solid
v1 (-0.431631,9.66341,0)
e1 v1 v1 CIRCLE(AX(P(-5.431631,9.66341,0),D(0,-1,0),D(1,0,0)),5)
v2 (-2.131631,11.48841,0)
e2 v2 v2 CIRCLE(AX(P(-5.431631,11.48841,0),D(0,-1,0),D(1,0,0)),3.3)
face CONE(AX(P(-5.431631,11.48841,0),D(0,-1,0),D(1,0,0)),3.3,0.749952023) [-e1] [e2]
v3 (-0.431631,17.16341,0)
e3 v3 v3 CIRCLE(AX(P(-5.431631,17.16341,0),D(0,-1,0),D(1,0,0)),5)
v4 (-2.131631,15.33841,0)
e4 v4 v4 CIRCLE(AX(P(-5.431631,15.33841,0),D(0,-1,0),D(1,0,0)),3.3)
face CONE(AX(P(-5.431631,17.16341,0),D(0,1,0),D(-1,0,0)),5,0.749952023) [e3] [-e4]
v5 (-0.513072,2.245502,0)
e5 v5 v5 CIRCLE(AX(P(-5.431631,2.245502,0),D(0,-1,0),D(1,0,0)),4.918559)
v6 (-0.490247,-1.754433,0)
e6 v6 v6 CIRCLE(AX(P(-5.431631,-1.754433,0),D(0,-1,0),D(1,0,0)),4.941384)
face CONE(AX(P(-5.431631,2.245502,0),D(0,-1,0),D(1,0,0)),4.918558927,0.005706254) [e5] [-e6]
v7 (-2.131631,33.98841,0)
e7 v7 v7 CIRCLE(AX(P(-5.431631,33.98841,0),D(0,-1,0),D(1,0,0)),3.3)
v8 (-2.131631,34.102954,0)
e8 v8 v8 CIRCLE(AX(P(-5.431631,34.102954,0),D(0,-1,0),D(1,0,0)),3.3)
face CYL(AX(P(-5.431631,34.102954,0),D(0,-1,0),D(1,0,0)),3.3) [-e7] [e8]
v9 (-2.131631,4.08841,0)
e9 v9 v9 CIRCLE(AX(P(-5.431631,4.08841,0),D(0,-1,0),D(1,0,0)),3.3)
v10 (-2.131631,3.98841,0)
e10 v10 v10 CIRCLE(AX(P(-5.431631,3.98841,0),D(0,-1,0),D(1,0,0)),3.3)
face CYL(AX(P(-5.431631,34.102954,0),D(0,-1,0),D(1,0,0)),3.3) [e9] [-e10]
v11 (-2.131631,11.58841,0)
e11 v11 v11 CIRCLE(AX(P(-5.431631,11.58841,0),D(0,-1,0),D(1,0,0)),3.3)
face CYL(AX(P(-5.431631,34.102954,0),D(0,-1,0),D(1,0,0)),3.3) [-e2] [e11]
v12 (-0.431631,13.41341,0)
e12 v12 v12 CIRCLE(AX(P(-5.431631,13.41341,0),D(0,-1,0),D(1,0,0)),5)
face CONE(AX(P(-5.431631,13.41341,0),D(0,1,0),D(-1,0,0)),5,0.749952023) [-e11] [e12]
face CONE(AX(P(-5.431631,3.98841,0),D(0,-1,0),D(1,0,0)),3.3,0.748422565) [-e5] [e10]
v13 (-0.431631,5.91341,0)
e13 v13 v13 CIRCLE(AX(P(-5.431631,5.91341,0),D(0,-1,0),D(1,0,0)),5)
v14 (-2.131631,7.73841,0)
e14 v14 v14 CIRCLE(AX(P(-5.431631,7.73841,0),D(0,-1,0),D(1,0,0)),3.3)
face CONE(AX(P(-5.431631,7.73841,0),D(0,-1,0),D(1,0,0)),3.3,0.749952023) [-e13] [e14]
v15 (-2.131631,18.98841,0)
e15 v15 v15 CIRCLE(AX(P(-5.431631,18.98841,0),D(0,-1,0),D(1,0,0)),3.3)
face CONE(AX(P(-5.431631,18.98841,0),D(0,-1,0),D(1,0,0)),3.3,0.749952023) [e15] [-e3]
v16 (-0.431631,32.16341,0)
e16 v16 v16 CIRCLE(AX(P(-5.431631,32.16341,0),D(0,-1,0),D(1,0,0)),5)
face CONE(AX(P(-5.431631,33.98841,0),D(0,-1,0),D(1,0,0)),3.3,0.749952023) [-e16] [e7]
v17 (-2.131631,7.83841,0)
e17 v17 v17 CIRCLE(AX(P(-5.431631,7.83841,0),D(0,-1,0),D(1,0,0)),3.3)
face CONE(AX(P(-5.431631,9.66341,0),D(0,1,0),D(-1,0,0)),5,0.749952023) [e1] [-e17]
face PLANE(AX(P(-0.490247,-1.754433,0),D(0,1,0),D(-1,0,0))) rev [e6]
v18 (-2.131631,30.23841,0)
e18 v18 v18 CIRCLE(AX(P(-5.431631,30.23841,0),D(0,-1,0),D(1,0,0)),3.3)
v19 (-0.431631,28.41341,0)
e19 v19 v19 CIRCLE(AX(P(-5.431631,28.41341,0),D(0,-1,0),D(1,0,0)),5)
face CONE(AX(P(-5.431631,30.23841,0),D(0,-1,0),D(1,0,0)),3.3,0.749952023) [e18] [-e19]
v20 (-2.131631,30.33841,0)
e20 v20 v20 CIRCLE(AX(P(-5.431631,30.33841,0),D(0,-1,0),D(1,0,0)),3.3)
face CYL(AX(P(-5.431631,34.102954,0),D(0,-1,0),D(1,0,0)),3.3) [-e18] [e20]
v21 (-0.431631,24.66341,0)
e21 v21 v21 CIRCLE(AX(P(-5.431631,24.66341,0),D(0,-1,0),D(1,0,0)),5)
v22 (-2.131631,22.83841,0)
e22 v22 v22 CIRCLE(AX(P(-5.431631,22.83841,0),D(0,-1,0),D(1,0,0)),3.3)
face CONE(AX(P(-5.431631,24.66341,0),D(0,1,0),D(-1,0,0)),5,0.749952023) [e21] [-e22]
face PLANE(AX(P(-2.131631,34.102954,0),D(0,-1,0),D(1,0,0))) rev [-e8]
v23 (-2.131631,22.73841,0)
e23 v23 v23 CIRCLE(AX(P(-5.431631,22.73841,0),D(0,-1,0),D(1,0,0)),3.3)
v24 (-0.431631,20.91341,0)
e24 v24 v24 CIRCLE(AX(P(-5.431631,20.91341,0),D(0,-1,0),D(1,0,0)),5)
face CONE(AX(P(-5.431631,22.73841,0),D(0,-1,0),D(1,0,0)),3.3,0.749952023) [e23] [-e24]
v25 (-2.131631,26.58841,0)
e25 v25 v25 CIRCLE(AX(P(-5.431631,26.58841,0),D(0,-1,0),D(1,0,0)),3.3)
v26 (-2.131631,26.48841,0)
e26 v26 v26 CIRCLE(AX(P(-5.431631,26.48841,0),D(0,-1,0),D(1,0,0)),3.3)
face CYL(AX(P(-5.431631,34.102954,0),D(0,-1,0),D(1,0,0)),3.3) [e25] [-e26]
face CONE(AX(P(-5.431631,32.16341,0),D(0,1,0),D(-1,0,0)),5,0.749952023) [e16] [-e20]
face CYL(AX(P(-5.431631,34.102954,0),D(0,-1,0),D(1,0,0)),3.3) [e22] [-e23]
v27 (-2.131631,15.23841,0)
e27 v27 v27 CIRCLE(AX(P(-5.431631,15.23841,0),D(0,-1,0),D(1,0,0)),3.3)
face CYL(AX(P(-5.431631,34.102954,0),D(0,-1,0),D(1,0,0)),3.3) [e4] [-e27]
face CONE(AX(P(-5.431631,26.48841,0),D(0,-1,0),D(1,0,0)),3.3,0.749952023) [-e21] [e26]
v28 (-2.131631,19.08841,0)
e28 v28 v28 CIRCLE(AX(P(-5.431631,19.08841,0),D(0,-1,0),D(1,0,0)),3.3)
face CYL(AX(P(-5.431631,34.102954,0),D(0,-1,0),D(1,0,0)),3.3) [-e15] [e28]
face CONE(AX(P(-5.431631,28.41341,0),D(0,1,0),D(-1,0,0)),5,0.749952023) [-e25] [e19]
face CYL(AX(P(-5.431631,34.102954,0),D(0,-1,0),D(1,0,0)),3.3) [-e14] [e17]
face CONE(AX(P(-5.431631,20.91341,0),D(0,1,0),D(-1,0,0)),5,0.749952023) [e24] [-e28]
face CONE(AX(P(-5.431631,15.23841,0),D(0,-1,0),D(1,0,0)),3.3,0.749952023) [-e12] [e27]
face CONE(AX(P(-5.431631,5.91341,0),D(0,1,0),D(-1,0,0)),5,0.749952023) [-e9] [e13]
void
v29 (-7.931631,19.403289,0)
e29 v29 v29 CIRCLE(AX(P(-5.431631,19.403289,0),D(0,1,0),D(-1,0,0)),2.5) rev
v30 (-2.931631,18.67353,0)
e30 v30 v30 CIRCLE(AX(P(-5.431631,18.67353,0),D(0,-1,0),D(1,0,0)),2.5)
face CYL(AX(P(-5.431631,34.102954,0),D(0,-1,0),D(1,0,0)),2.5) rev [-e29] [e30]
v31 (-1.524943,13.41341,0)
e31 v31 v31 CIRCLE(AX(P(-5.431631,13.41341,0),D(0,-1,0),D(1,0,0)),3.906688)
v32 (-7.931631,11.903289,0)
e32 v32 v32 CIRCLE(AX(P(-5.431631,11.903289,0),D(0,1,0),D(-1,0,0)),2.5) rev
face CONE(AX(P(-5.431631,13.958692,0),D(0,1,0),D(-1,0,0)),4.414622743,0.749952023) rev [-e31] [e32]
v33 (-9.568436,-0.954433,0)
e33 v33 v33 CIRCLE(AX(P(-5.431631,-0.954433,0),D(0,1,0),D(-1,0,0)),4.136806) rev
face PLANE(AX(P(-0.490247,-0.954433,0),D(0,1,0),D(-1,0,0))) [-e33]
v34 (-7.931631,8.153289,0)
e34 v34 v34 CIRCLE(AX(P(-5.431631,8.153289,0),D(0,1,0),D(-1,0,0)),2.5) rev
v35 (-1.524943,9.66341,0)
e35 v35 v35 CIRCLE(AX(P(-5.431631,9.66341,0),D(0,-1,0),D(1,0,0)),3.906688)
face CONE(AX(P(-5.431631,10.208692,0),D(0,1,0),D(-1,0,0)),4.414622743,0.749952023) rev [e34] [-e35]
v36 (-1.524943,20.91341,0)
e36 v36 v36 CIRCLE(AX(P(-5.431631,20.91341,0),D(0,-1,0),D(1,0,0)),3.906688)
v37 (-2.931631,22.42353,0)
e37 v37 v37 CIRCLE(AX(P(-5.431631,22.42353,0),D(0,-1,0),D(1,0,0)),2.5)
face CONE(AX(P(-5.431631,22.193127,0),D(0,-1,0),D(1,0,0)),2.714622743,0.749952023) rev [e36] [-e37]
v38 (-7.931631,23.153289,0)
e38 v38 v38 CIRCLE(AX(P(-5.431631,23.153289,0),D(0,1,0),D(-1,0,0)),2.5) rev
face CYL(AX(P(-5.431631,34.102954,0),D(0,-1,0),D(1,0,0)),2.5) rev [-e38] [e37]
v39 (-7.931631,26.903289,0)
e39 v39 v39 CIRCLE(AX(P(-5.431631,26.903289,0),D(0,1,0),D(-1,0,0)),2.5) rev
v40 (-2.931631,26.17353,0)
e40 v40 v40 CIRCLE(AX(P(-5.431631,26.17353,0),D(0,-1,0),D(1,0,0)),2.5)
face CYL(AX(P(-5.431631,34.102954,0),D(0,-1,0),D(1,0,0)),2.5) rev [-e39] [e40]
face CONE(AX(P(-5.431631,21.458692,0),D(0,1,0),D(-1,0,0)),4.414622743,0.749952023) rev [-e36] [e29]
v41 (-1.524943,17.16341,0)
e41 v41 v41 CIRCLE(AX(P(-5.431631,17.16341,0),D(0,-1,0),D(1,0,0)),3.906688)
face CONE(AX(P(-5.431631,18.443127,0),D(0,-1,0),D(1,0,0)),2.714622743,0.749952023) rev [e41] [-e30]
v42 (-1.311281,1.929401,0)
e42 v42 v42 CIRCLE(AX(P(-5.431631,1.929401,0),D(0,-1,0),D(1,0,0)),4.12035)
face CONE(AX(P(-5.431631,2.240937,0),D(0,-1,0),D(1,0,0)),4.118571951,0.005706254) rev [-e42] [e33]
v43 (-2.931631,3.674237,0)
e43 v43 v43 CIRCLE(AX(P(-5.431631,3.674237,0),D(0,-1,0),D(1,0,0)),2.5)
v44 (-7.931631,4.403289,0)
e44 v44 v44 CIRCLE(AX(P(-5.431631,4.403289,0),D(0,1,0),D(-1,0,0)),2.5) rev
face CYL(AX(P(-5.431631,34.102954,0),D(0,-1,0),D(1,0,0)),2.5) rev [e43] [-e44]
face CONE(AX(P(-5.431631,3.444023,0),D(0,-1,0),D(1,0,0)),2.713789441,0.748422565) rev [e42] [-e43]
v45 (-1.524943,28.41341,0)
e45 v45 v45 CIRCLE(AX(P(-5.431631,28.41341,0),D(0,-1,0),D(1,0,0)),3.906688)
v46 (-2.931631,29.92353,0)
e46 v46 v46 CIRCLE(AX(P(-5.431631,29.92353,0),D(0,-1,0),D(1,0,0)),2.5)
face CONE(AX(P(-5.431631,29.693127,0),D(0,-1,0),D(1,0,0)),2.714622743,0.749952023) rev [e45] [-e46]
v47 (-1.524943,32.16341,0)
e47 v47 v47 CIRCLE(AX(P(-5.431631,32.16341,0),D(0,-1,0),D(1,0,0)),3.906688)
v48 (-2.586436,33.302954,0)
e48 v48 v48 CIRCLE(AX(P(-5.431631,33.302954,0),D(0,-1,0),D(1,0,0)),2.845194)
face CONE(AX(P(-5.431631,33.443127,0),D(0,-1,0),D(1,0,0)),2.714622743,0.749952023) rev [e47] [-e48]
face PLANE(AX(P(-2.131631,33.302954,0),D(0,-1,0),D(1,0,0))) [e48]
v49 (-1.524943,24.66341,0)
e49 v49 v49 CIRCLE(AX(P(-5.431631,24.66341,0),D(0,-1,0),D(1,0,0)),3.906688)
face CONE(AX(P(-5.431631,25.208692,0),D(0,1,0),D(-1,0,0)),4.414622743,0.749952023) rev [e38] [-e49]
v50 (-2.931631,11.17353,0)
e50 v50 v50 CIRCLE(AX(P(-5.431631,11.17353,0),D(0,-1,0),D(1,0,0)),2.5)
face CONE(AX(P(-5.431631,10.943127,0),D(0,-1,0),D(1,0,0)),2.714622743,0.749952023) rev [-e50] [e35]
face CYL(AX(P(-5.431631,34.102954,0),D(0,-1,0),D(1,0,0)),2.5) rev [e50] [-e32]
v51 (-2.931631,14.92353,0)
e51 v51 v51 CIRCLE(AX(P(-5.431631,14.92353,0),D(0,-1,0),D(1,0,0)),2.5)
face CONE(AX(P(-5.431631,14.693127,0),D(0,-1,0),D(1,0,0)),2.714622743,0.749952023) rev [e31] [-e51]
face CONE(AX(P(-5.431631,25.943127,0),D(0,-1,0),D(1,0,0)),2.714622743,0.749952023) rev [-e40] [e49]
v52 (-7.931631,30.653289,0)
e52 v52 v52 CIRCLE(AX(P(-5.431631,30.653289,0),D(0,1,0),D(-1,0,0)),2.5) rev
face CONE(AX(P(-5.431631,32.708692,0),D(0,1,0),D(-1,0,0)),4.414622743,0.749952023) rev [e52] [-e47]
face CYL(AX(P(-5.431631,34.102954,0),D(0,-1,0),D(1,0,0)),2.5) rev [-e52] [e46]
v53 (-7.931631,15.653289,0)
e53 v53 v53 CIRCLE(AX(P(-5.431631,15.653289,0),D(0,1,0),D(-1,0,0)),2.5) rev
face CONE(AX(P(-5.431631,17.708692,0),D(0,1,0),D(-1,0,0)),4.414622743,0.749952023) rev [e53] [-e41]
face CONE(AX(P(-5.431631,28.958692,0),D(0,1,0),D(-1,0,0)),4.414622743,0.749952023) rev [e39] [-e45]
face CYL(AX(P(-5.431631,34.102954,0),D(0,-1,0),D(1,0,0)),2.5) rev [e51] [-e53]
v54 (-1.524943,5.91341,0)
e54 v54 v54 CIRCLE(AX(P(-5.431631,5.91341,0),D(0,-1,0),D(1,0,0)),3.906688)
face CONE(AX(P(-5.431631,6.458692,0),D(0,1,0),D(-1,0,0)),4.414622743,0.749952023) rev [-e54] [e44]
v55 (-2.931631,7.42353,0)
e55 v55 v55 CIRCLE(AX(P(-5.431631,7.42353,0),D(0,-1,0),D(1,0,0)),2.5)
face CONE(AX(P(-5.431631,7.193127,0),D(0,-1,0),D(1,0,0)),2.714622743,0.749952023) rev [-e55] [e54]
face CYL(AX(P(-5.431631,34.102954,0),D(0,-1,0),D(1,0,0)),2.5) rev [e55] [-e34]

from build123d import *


# Read off the part's stored shape, not the designer's step: Thicken1
with BuildPart() as part:
    # Thicken1 outline → Thicken1 (revolve)
    with BuildSketch(Plane(origin=(-5.431630681, 0, 0), x_dir=(1, 0, 0), z_dir=(0, 0, 1))):
        Polygon((0, -0.954433192), (0, -1.754433192), (4.941383818, -1.754433192), (4.918558927, 2.245501685), (3.3, 3.988409531), (3.3, 4.088409531), (5, 5.913409531), (3.3, 7.738409531), (3.3, 7.838409531), (5, 9.663409531), (3.3, 11.488409531), (3.3, 11.588409531), (5, 13.413409531), (3.3, 15.238409531), (3.3, 15.338409531), (5, 17.163409531), (3.3, 18.988409531), (3.3, 19.088409531), (5, 20.913409531), (3.3, 22.738409531), (3.3, 22.838409531), (5, 24.663409531), (3.3, 26.488409531), (3.3, 26.588409531), (5, 28.413409531), (3.3, 30.238409531), (3.3, 30.338409531), (5, 32.163409531), (3.3, 33.988409531), (3.3, 34.102954004), (0, 34.102954004), (0, 33.302954004), (2.845194483, 33.302954004), (3.906687965, 32.163409531), (2.5, 30.653288628), (2.5, 29.923530434), (3.906687965, 28.413409531), (2.5, 26.903288628), (2.5, 26.173530434), (3.906687965, 24.663409531), (2.5, 23.153288628), (2.5, 22.423530434), (3.906687965, 20.913409531), (2.5, 19.403288628), (2.5, 18.673530434), (3.906687965, 17.163409531), (2.5, 15.653288628), (2.5, 14.923530434), (3.906687965, 13.413409531), (2.5, 11.903288628), (2.5, 11.173530434), (3.906687965, 9.663409531), (2.5, 8.153288628), (2.5, 7.423530434), (3.906687965, 5.913409531), (2.5, 4.403288628), (2.5, 3.674236782), (4.120349674, 1.929400611), (4.136805741, -0.954433192), align=None)
    revolve(axis=Axis((-5.431630681, 0, 0), (0, 1, 0)))


solid = part.part
